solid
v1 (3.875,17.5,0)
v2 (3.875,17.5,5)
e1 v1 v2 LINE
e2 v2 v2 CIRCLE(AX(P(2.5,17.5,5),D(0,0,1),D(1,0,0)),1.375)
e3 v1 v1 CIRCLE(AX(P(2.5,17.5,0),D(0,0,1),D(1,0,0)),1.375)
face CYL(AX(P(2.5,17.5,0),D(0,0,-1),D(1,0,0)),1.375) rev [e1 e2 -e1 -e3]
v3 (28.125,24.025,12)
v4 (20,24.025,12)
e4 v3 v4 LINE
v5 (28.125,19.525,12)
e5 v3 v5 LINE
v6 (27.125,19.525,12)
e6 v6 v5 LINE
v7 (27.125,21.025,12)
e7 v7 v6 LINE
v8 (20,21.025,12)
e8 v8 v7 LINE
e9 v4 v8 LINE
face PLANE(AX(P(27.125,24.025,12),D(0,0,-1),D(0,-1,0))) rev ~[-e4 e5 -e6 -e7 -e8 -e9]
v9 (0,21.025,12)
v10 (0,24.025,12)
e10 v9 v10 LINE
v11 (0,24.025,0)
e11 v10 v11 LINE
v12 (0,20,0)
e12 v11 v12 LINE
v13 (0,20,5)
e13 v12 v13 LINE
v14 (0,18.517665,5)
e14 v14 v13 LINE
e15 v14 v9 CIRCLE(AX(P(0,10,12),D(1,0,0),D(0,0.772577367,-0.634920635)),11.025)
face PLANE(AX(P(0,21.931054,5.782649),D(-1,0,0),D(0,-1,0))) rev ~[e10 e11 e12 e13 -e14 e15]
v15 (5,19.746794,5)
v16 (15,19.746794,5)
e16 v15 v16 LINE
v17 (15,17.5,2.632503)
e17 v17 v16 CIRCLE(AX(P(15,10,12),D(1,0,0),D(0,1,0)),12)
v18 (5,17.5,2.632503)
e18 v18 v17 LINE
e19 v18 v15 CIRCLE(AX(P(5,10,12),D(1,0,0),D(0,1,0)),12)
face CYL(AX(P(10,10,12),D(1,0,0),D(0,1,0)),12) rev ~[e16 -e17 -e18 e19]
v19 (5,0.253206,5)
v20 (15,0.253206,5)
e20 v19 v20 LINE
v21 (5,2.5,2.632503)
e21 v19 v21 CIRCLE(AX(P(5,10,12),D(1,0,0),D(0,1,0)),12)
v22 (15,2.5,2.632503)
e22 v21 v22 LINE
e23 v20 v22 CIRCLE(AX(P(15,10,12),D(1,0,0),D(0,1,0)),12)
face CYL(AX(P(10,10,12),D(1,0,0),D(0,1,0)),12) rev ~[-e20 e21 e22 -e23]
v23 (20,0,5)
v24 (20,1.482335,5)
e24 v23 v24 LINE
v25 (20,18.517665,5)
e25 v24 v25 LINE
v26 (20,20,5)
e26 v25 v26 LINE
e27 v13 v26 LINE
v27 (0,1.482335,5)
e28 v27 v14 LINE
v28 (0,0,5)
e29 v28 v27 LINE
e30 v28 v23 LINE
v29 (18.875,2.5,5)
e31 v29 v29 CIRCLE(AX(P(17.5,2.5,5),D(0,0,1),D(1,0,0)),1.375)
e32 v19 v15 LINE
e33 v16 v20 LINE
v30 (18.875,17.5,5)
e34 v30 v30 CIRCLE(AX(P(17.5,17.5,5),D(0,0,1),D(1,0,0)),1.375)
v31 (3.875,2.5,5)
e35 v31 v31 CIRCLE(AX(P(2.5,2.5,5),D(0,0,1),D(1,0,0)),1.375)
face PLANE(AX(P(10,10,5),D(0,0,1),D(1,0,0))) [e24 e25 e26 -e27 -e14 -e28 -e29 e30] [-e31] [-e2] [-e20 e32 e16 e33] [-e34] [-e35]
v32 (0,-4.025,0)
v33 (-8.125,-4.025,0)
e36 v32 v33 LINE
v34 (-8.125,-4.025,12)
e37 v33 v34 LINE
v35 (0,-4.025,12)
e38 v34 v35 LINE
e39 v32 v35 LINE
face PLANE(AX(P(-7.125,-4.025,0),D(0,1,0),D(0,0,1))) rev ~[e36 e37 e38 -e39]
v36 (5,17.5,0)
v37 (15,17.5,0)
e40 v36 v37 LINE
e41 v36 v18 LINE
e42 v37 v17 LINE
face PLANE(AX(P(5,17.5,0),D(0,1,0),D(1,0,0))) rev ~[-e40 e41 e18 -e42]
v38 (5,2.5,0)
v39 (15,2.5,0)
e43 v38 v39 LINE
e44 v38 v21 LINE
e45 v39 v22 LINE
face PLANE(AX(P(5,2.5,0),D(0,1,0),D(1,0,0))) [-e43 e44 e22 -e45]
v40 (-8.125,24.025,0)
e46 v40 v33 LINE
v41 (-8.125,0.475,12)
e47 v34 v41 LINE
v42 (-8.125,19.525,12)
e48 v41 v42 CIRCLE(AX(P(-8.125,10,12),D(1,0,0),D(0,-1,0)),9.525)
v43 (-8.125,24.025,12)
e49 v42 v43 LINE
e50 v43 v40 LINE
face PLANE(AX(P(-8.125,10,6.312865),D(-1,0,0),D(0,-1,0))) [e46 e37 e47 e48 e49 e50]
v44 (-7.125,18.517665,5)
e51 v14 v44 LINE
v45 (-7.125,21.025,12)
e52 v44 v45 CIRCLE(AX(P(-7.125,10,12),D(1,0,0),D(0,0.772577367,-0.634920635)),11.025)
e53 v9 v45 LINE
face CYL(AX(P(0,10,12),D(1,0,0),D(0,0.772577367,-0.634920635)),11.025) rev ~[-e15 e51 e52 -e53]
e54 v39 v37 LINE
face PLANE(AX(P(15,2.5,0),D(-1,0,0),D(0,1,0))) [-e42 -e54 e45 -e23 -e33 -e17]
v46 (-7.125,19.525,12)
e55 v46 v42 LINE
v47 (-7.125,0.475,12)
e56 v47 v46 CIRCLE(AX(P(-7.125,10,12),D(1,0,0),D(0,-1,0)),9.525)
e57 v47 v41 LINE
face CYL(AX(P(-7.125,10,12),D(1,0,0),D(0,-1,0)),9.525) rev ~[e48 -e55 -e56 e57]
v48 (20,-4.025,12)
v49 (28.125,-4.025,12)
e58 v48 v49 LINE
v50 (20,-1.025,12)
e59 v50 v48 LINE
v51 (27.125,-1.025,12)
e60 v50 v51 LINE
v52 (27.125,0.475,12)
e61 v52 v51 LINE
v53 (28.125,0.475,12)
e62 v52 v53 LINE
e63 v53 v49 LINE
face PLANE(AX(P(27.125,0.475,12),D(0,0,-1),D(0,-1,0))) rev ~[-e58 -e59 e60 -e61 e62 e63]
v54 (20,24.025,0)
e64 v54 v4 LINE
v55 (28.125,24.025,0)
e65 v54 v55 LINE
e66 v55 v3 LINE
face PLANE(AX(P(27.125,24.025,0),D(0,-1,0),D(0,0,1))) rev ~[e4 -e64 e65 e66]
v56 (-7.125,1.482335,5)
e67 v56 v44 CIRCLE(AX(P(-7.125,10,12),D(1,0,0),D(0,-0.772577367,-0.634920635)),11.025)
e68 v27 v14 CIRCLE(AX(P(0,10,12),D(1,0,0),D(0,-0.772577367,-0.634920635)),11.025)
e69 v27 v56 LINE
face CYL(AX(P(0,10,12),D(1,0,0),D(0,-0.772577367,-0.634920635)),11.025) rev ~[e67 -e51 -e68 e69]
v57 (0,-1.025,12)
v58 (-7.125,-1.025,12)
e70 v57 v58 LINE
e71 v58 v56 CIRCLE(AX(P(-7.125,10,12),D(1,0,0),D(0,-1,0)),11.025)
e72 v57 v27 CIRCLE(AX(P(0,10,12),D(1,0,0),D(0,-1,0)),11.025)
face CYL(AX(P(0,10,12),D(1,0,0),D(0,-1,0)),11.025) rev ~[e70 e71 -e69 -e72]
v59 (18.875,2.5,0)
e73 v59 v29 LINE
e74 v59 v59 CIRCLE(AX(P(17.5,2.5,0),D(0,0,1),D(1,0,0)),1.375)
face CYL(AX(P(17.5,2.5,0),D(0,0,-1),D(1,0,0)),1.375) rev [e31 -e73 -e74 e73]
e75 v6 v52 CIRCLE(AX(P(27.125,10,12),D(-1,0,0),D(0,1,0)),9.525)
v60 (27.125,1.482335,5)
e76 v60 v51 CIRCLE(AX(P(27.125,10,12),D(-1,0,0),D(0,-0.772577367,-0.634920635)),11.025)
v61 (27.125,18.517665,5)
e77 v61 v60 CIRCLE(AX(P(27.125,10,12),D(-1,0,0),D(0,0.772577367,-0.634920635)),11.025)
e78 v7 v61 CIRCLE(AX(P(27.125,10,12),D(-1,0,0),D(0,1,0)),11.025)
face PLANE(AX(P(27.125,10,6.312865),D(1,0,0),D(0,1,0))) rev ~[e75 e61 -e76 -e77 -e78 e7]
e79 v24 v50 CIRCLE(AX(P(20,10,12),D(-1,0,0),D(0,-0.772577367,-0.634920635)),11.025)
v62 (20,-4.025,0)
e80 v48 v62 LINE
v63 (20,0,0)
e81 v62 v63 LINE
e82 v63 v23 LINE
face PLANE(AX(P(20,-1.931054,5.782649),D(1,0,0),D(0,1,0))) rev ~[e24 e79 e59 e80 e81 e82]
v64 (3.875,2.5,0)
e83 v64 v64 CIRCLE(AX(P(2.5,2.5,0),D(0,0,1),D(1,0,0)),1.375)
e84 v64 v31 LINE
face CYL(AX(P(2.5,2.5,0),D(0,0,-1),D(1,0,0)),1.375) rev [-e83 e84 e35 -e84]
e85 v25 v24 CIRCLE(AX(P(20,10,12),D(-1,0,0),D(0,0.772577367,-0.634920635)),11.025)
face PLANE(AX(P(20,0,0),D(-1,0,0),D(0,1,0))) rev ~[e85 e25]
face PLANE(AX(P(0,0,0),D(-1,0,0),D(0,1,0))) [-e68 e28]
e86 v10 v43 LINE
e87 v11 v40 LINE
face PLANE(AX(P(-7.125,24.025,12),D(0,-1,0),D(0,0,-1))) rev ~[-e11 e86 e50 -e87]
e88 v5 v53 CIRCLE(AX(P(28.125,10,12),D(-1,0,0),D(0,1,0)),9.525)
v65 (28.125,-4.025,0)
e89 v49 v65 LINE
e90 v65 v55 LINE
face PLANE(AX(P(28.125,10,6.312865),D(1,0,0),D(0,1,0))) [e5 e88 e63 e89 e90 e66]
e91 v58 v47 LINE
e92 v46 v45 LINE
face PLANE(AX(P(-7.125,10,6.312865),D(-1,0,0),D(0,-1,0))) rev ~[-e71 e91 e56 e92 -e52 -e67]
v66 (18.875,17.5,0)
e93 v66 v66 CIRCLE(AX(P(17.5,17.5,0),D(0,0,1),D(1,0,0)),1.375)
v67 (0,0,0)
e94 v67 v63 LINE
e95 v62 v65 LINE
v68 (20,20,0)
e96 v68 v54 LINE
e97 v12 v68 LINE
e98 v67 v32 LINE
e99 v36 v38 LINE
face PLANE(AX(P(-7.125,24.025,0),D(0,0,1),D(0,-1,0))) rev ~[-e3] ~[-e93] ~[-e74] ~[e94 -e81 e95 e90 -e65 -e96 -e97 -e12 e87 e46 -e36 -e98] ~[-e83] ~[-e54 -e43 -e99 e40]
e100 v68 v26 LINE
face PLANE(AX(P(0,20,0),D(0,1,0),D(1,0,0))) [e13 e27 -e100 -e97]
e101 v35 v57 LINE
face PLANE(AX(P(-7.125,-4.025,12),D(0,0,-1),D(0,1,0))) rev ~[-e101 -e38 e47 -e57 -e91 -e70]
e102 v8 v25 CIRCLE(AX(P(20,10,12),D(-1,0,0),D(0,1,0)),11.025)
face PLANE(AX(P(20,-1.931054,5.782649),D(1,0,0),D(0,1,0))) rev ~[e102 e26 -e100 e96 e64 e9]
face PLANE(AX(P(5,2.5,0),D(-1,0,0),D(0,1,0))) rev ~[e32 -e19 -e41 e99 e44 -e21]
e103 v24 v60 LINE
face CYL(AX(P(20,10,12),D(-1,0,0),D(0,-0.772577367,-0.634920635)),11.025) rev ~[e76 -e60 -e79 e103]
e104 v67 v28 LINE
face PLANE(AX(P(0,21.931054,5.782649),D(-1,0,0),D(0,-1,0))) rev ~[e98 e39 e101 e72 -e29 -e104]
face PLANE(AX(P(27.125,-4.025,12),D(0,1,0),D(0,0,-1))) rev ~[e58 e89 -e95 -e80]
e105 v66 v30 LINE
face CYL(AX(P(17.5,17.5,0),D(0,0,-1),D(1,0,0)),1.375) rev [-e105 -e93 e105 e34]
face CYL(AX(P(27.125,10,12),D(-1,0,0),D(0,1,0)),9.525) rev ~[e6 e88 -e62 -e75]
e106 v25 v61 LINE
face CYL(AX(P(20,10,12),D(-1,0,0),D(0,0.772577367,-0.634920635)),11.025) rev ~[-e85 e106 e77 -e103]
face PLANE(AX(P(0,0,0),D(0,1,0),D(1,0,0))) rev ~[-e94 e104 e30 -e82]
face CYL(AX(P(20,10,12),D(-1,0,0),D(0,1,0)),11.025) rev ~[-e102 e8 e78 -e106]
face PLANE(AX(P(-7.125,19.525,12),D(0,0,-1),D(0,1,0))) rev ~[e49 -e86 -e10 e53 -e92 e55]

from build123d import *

# Parameters (mm, degrees)
F0_W      = 20
F0_H      = 20
F0_R      = 1.375
F0_W_2    = 10
F0_H_2    = 15
F1_DEPTH  = 5
F3_DEPTH  = 7.125
F6_DEPTH  = 7.125
F8_DEPTH  = 1
F10_DEPTH = 1
F11_R     = 12
F12_DEPTH = 5


with BuildPart() as f1:
    # F0 (on Top) → F1 (new body)
    with BuildSketch(Plane.XY):
        with Locations((10, 10)):
            Rectangle(F0_W, F0_H)
        with Locations((2.5, 2.5)):
            Circle(F0_R, mode=Mode.SUBTRACT)
        with Locations((17.5, 2.5)):
            Circle(F0_R, mode=Mode.SUBTRACT)
        with Locations((2.5, 17.5)):
            Circle(F0_R, mode=Mode.SUBTRACT)
        with Locations((10, 10)):
            Rectangle(F0_W_2, F0_H_2, mode=Mode.SUBTRACT)
        with Locations((17.5, 17.5)):
            Circle(F0_R, mode=Mode.SUBTRACT)
    extrude(amount=F1_DEPTH)

    # F2 (on face) → F3 (join)
    with BuildSketch(Plane(origin=(0, 0, 0), x_dir=(0, -1, 0), z_dir=(-1, 0, 0))):
        with BuildLine():
            ThreePointArc((-18.5176654665, 5), (-20.379255435, 8.2822477738), (-21.025, 12))
            Line((-21.025, 12), (-24.025, 12))
            Line((-24.025, 12), (-24.025, 0))
            Line((-24.025, 0), (-20, 0))
            Line((-20, 0), (-20, 5))
            Line((-20, 5), (-18.5176654665, 5))
        make_face()
        with BuildLine():
            ThreePointArc((-1.4823345335, 5), (-10, 0.975), (-18.5176654665, 5))
            Line((-18.5176654665, 5), (-20, 5))
            Line((-20, 5), (-20, 0))
            Line((-20, 0), (0, 0))
            Line((0, 0), (0, 5))
            Line((0, 5), (-1.4823345335, 5))
        make_face()
        with BuildLine():
            ThreePointArc((1.025, 12), (0.379255435, 8.2822477738), (-1.4823345335, 5))
            Line((-1.4823345335, 5), (0, 5))
            Line((0, 5), (0, 0))
            Line((0, 0), (4.025, 0))
            Line((4.025, 0), (4.025, 12))
            Line((4.025, 12), (1.025, 12))
        make_face()
    extrude(amount=F3_DEPTH)

    # F5 (on face) → F6 (join)
    with BuildSketch(Plane.YZ.offset(20)):
        with BuildLine():
            Line((0, 5), (1.4823345335, 5))
            ThreePointArc((1.4823345335, 5), (-0.379255435, 8.2822477738), (-1.025, 12))
            Line((-1.025, 12), (-4.025, 12))
            Line((-4.025, 12), (-4.025, 0))
            Line((-4.025, 0), (0, 0))
            Line((0, 0), (0, 5))
        make_face()
        with BuildLine():
            ThreePointArc((18.5176654665, 5), (10, 0.975), (1.4823345335, 5))
            Line((1.4823345335, 5), (0, 5))
            Line((0, 5), (0, 0))
            Line((0, 0), (20, 0))
            Line((20, 0), (20, 5))
            Line((20, 5), (18.5176654665, 5))
        make_face()
        with BuildLine():
            ThreePointArc((21.025, 12), (20.379255435, 8.2822477738), (18.5176654665, 5))
            Line((18.5176654665, 5), (20, 5))
            Line((20, 5), (20, 0))
            Line((20, 0), (24.025, 0))
            Line((24.025, 0), (24.025, 12))
            Line((24.025, 12), (21.025, 12))
        make_face()
    extrude(amount=F6_DEPTH)

    # F7 (on face) → F8 (join)
    with BuildSketch(Plane.YZ.offset(27.125)):
        with BuildLine():
            Line((0.475, 12), (-1.025, 12))
            ThreePointArc((-1.025, 12), (10, 0.975), (21.025, 12))
            Line((21.025, 12), (19.525, 12))
            ThreePointArc((19.525, 12), (10, 2.475), (0.475, 12))
        make_face()
        with BuildLine():
            Line((-4.025, 12), (-4.025, 0))
            Line((-4.025, 0), (24.025, 0))
            Line((24.025, 0), (24.025, 12))
            Line((24.025, 12), (21.025, 12))
            ThreePointArc((21.025, 12), (10, 0.975), (-1.025, 12))
            Line((-1.025, 12), (-4.025, 12))
        make_face()
    extrude(amount=F8_DEPTH)

    # F9 (on face) → F10 (join)
    with BuildSketch(Plane(origin=(-7.125, 0, 0), x_dir=(0, -1, 0), z_dir=(-1, 0, 0))):
        with BuildLine():
            Line((-19.525, 12), (-21.025, 12))
            ThreePointArc((-21.025, 12), (-10, 0.975), (1.025, 12))
            Line((1.025, 12), (-0.475, 12))
            ThreePointArc((-0.475, 12), (-10, 2.475), (-19.525, 12))
        make_face()
        with BuildLine():
            Line((-21.025, 12), (-24.025, 12))
            Line((-24.025, 12), (-24.025, 0))
            Line((-24.025, 0), (4.025, 0))
            Line((4.025, 0), (4.025, 12))
            Line((4.025, 12), (1.025, 12))
            ThreePointArc((1.025, 12), (-10, 0.975), (-21.025, 12))
        make_face()
    extrude(amount=F10_DEPTH)

    # F11 (on offset) → F12 (cut, symmetric)
    with BuildSketch(Plane.YZ.offset(10)):
        with Locations((10, 12)):
            Circle(F11_R)
    extrude(amount=F12_DEPTH, both=True, mode=Mode.SUBTRACT)


solid = f1.part
